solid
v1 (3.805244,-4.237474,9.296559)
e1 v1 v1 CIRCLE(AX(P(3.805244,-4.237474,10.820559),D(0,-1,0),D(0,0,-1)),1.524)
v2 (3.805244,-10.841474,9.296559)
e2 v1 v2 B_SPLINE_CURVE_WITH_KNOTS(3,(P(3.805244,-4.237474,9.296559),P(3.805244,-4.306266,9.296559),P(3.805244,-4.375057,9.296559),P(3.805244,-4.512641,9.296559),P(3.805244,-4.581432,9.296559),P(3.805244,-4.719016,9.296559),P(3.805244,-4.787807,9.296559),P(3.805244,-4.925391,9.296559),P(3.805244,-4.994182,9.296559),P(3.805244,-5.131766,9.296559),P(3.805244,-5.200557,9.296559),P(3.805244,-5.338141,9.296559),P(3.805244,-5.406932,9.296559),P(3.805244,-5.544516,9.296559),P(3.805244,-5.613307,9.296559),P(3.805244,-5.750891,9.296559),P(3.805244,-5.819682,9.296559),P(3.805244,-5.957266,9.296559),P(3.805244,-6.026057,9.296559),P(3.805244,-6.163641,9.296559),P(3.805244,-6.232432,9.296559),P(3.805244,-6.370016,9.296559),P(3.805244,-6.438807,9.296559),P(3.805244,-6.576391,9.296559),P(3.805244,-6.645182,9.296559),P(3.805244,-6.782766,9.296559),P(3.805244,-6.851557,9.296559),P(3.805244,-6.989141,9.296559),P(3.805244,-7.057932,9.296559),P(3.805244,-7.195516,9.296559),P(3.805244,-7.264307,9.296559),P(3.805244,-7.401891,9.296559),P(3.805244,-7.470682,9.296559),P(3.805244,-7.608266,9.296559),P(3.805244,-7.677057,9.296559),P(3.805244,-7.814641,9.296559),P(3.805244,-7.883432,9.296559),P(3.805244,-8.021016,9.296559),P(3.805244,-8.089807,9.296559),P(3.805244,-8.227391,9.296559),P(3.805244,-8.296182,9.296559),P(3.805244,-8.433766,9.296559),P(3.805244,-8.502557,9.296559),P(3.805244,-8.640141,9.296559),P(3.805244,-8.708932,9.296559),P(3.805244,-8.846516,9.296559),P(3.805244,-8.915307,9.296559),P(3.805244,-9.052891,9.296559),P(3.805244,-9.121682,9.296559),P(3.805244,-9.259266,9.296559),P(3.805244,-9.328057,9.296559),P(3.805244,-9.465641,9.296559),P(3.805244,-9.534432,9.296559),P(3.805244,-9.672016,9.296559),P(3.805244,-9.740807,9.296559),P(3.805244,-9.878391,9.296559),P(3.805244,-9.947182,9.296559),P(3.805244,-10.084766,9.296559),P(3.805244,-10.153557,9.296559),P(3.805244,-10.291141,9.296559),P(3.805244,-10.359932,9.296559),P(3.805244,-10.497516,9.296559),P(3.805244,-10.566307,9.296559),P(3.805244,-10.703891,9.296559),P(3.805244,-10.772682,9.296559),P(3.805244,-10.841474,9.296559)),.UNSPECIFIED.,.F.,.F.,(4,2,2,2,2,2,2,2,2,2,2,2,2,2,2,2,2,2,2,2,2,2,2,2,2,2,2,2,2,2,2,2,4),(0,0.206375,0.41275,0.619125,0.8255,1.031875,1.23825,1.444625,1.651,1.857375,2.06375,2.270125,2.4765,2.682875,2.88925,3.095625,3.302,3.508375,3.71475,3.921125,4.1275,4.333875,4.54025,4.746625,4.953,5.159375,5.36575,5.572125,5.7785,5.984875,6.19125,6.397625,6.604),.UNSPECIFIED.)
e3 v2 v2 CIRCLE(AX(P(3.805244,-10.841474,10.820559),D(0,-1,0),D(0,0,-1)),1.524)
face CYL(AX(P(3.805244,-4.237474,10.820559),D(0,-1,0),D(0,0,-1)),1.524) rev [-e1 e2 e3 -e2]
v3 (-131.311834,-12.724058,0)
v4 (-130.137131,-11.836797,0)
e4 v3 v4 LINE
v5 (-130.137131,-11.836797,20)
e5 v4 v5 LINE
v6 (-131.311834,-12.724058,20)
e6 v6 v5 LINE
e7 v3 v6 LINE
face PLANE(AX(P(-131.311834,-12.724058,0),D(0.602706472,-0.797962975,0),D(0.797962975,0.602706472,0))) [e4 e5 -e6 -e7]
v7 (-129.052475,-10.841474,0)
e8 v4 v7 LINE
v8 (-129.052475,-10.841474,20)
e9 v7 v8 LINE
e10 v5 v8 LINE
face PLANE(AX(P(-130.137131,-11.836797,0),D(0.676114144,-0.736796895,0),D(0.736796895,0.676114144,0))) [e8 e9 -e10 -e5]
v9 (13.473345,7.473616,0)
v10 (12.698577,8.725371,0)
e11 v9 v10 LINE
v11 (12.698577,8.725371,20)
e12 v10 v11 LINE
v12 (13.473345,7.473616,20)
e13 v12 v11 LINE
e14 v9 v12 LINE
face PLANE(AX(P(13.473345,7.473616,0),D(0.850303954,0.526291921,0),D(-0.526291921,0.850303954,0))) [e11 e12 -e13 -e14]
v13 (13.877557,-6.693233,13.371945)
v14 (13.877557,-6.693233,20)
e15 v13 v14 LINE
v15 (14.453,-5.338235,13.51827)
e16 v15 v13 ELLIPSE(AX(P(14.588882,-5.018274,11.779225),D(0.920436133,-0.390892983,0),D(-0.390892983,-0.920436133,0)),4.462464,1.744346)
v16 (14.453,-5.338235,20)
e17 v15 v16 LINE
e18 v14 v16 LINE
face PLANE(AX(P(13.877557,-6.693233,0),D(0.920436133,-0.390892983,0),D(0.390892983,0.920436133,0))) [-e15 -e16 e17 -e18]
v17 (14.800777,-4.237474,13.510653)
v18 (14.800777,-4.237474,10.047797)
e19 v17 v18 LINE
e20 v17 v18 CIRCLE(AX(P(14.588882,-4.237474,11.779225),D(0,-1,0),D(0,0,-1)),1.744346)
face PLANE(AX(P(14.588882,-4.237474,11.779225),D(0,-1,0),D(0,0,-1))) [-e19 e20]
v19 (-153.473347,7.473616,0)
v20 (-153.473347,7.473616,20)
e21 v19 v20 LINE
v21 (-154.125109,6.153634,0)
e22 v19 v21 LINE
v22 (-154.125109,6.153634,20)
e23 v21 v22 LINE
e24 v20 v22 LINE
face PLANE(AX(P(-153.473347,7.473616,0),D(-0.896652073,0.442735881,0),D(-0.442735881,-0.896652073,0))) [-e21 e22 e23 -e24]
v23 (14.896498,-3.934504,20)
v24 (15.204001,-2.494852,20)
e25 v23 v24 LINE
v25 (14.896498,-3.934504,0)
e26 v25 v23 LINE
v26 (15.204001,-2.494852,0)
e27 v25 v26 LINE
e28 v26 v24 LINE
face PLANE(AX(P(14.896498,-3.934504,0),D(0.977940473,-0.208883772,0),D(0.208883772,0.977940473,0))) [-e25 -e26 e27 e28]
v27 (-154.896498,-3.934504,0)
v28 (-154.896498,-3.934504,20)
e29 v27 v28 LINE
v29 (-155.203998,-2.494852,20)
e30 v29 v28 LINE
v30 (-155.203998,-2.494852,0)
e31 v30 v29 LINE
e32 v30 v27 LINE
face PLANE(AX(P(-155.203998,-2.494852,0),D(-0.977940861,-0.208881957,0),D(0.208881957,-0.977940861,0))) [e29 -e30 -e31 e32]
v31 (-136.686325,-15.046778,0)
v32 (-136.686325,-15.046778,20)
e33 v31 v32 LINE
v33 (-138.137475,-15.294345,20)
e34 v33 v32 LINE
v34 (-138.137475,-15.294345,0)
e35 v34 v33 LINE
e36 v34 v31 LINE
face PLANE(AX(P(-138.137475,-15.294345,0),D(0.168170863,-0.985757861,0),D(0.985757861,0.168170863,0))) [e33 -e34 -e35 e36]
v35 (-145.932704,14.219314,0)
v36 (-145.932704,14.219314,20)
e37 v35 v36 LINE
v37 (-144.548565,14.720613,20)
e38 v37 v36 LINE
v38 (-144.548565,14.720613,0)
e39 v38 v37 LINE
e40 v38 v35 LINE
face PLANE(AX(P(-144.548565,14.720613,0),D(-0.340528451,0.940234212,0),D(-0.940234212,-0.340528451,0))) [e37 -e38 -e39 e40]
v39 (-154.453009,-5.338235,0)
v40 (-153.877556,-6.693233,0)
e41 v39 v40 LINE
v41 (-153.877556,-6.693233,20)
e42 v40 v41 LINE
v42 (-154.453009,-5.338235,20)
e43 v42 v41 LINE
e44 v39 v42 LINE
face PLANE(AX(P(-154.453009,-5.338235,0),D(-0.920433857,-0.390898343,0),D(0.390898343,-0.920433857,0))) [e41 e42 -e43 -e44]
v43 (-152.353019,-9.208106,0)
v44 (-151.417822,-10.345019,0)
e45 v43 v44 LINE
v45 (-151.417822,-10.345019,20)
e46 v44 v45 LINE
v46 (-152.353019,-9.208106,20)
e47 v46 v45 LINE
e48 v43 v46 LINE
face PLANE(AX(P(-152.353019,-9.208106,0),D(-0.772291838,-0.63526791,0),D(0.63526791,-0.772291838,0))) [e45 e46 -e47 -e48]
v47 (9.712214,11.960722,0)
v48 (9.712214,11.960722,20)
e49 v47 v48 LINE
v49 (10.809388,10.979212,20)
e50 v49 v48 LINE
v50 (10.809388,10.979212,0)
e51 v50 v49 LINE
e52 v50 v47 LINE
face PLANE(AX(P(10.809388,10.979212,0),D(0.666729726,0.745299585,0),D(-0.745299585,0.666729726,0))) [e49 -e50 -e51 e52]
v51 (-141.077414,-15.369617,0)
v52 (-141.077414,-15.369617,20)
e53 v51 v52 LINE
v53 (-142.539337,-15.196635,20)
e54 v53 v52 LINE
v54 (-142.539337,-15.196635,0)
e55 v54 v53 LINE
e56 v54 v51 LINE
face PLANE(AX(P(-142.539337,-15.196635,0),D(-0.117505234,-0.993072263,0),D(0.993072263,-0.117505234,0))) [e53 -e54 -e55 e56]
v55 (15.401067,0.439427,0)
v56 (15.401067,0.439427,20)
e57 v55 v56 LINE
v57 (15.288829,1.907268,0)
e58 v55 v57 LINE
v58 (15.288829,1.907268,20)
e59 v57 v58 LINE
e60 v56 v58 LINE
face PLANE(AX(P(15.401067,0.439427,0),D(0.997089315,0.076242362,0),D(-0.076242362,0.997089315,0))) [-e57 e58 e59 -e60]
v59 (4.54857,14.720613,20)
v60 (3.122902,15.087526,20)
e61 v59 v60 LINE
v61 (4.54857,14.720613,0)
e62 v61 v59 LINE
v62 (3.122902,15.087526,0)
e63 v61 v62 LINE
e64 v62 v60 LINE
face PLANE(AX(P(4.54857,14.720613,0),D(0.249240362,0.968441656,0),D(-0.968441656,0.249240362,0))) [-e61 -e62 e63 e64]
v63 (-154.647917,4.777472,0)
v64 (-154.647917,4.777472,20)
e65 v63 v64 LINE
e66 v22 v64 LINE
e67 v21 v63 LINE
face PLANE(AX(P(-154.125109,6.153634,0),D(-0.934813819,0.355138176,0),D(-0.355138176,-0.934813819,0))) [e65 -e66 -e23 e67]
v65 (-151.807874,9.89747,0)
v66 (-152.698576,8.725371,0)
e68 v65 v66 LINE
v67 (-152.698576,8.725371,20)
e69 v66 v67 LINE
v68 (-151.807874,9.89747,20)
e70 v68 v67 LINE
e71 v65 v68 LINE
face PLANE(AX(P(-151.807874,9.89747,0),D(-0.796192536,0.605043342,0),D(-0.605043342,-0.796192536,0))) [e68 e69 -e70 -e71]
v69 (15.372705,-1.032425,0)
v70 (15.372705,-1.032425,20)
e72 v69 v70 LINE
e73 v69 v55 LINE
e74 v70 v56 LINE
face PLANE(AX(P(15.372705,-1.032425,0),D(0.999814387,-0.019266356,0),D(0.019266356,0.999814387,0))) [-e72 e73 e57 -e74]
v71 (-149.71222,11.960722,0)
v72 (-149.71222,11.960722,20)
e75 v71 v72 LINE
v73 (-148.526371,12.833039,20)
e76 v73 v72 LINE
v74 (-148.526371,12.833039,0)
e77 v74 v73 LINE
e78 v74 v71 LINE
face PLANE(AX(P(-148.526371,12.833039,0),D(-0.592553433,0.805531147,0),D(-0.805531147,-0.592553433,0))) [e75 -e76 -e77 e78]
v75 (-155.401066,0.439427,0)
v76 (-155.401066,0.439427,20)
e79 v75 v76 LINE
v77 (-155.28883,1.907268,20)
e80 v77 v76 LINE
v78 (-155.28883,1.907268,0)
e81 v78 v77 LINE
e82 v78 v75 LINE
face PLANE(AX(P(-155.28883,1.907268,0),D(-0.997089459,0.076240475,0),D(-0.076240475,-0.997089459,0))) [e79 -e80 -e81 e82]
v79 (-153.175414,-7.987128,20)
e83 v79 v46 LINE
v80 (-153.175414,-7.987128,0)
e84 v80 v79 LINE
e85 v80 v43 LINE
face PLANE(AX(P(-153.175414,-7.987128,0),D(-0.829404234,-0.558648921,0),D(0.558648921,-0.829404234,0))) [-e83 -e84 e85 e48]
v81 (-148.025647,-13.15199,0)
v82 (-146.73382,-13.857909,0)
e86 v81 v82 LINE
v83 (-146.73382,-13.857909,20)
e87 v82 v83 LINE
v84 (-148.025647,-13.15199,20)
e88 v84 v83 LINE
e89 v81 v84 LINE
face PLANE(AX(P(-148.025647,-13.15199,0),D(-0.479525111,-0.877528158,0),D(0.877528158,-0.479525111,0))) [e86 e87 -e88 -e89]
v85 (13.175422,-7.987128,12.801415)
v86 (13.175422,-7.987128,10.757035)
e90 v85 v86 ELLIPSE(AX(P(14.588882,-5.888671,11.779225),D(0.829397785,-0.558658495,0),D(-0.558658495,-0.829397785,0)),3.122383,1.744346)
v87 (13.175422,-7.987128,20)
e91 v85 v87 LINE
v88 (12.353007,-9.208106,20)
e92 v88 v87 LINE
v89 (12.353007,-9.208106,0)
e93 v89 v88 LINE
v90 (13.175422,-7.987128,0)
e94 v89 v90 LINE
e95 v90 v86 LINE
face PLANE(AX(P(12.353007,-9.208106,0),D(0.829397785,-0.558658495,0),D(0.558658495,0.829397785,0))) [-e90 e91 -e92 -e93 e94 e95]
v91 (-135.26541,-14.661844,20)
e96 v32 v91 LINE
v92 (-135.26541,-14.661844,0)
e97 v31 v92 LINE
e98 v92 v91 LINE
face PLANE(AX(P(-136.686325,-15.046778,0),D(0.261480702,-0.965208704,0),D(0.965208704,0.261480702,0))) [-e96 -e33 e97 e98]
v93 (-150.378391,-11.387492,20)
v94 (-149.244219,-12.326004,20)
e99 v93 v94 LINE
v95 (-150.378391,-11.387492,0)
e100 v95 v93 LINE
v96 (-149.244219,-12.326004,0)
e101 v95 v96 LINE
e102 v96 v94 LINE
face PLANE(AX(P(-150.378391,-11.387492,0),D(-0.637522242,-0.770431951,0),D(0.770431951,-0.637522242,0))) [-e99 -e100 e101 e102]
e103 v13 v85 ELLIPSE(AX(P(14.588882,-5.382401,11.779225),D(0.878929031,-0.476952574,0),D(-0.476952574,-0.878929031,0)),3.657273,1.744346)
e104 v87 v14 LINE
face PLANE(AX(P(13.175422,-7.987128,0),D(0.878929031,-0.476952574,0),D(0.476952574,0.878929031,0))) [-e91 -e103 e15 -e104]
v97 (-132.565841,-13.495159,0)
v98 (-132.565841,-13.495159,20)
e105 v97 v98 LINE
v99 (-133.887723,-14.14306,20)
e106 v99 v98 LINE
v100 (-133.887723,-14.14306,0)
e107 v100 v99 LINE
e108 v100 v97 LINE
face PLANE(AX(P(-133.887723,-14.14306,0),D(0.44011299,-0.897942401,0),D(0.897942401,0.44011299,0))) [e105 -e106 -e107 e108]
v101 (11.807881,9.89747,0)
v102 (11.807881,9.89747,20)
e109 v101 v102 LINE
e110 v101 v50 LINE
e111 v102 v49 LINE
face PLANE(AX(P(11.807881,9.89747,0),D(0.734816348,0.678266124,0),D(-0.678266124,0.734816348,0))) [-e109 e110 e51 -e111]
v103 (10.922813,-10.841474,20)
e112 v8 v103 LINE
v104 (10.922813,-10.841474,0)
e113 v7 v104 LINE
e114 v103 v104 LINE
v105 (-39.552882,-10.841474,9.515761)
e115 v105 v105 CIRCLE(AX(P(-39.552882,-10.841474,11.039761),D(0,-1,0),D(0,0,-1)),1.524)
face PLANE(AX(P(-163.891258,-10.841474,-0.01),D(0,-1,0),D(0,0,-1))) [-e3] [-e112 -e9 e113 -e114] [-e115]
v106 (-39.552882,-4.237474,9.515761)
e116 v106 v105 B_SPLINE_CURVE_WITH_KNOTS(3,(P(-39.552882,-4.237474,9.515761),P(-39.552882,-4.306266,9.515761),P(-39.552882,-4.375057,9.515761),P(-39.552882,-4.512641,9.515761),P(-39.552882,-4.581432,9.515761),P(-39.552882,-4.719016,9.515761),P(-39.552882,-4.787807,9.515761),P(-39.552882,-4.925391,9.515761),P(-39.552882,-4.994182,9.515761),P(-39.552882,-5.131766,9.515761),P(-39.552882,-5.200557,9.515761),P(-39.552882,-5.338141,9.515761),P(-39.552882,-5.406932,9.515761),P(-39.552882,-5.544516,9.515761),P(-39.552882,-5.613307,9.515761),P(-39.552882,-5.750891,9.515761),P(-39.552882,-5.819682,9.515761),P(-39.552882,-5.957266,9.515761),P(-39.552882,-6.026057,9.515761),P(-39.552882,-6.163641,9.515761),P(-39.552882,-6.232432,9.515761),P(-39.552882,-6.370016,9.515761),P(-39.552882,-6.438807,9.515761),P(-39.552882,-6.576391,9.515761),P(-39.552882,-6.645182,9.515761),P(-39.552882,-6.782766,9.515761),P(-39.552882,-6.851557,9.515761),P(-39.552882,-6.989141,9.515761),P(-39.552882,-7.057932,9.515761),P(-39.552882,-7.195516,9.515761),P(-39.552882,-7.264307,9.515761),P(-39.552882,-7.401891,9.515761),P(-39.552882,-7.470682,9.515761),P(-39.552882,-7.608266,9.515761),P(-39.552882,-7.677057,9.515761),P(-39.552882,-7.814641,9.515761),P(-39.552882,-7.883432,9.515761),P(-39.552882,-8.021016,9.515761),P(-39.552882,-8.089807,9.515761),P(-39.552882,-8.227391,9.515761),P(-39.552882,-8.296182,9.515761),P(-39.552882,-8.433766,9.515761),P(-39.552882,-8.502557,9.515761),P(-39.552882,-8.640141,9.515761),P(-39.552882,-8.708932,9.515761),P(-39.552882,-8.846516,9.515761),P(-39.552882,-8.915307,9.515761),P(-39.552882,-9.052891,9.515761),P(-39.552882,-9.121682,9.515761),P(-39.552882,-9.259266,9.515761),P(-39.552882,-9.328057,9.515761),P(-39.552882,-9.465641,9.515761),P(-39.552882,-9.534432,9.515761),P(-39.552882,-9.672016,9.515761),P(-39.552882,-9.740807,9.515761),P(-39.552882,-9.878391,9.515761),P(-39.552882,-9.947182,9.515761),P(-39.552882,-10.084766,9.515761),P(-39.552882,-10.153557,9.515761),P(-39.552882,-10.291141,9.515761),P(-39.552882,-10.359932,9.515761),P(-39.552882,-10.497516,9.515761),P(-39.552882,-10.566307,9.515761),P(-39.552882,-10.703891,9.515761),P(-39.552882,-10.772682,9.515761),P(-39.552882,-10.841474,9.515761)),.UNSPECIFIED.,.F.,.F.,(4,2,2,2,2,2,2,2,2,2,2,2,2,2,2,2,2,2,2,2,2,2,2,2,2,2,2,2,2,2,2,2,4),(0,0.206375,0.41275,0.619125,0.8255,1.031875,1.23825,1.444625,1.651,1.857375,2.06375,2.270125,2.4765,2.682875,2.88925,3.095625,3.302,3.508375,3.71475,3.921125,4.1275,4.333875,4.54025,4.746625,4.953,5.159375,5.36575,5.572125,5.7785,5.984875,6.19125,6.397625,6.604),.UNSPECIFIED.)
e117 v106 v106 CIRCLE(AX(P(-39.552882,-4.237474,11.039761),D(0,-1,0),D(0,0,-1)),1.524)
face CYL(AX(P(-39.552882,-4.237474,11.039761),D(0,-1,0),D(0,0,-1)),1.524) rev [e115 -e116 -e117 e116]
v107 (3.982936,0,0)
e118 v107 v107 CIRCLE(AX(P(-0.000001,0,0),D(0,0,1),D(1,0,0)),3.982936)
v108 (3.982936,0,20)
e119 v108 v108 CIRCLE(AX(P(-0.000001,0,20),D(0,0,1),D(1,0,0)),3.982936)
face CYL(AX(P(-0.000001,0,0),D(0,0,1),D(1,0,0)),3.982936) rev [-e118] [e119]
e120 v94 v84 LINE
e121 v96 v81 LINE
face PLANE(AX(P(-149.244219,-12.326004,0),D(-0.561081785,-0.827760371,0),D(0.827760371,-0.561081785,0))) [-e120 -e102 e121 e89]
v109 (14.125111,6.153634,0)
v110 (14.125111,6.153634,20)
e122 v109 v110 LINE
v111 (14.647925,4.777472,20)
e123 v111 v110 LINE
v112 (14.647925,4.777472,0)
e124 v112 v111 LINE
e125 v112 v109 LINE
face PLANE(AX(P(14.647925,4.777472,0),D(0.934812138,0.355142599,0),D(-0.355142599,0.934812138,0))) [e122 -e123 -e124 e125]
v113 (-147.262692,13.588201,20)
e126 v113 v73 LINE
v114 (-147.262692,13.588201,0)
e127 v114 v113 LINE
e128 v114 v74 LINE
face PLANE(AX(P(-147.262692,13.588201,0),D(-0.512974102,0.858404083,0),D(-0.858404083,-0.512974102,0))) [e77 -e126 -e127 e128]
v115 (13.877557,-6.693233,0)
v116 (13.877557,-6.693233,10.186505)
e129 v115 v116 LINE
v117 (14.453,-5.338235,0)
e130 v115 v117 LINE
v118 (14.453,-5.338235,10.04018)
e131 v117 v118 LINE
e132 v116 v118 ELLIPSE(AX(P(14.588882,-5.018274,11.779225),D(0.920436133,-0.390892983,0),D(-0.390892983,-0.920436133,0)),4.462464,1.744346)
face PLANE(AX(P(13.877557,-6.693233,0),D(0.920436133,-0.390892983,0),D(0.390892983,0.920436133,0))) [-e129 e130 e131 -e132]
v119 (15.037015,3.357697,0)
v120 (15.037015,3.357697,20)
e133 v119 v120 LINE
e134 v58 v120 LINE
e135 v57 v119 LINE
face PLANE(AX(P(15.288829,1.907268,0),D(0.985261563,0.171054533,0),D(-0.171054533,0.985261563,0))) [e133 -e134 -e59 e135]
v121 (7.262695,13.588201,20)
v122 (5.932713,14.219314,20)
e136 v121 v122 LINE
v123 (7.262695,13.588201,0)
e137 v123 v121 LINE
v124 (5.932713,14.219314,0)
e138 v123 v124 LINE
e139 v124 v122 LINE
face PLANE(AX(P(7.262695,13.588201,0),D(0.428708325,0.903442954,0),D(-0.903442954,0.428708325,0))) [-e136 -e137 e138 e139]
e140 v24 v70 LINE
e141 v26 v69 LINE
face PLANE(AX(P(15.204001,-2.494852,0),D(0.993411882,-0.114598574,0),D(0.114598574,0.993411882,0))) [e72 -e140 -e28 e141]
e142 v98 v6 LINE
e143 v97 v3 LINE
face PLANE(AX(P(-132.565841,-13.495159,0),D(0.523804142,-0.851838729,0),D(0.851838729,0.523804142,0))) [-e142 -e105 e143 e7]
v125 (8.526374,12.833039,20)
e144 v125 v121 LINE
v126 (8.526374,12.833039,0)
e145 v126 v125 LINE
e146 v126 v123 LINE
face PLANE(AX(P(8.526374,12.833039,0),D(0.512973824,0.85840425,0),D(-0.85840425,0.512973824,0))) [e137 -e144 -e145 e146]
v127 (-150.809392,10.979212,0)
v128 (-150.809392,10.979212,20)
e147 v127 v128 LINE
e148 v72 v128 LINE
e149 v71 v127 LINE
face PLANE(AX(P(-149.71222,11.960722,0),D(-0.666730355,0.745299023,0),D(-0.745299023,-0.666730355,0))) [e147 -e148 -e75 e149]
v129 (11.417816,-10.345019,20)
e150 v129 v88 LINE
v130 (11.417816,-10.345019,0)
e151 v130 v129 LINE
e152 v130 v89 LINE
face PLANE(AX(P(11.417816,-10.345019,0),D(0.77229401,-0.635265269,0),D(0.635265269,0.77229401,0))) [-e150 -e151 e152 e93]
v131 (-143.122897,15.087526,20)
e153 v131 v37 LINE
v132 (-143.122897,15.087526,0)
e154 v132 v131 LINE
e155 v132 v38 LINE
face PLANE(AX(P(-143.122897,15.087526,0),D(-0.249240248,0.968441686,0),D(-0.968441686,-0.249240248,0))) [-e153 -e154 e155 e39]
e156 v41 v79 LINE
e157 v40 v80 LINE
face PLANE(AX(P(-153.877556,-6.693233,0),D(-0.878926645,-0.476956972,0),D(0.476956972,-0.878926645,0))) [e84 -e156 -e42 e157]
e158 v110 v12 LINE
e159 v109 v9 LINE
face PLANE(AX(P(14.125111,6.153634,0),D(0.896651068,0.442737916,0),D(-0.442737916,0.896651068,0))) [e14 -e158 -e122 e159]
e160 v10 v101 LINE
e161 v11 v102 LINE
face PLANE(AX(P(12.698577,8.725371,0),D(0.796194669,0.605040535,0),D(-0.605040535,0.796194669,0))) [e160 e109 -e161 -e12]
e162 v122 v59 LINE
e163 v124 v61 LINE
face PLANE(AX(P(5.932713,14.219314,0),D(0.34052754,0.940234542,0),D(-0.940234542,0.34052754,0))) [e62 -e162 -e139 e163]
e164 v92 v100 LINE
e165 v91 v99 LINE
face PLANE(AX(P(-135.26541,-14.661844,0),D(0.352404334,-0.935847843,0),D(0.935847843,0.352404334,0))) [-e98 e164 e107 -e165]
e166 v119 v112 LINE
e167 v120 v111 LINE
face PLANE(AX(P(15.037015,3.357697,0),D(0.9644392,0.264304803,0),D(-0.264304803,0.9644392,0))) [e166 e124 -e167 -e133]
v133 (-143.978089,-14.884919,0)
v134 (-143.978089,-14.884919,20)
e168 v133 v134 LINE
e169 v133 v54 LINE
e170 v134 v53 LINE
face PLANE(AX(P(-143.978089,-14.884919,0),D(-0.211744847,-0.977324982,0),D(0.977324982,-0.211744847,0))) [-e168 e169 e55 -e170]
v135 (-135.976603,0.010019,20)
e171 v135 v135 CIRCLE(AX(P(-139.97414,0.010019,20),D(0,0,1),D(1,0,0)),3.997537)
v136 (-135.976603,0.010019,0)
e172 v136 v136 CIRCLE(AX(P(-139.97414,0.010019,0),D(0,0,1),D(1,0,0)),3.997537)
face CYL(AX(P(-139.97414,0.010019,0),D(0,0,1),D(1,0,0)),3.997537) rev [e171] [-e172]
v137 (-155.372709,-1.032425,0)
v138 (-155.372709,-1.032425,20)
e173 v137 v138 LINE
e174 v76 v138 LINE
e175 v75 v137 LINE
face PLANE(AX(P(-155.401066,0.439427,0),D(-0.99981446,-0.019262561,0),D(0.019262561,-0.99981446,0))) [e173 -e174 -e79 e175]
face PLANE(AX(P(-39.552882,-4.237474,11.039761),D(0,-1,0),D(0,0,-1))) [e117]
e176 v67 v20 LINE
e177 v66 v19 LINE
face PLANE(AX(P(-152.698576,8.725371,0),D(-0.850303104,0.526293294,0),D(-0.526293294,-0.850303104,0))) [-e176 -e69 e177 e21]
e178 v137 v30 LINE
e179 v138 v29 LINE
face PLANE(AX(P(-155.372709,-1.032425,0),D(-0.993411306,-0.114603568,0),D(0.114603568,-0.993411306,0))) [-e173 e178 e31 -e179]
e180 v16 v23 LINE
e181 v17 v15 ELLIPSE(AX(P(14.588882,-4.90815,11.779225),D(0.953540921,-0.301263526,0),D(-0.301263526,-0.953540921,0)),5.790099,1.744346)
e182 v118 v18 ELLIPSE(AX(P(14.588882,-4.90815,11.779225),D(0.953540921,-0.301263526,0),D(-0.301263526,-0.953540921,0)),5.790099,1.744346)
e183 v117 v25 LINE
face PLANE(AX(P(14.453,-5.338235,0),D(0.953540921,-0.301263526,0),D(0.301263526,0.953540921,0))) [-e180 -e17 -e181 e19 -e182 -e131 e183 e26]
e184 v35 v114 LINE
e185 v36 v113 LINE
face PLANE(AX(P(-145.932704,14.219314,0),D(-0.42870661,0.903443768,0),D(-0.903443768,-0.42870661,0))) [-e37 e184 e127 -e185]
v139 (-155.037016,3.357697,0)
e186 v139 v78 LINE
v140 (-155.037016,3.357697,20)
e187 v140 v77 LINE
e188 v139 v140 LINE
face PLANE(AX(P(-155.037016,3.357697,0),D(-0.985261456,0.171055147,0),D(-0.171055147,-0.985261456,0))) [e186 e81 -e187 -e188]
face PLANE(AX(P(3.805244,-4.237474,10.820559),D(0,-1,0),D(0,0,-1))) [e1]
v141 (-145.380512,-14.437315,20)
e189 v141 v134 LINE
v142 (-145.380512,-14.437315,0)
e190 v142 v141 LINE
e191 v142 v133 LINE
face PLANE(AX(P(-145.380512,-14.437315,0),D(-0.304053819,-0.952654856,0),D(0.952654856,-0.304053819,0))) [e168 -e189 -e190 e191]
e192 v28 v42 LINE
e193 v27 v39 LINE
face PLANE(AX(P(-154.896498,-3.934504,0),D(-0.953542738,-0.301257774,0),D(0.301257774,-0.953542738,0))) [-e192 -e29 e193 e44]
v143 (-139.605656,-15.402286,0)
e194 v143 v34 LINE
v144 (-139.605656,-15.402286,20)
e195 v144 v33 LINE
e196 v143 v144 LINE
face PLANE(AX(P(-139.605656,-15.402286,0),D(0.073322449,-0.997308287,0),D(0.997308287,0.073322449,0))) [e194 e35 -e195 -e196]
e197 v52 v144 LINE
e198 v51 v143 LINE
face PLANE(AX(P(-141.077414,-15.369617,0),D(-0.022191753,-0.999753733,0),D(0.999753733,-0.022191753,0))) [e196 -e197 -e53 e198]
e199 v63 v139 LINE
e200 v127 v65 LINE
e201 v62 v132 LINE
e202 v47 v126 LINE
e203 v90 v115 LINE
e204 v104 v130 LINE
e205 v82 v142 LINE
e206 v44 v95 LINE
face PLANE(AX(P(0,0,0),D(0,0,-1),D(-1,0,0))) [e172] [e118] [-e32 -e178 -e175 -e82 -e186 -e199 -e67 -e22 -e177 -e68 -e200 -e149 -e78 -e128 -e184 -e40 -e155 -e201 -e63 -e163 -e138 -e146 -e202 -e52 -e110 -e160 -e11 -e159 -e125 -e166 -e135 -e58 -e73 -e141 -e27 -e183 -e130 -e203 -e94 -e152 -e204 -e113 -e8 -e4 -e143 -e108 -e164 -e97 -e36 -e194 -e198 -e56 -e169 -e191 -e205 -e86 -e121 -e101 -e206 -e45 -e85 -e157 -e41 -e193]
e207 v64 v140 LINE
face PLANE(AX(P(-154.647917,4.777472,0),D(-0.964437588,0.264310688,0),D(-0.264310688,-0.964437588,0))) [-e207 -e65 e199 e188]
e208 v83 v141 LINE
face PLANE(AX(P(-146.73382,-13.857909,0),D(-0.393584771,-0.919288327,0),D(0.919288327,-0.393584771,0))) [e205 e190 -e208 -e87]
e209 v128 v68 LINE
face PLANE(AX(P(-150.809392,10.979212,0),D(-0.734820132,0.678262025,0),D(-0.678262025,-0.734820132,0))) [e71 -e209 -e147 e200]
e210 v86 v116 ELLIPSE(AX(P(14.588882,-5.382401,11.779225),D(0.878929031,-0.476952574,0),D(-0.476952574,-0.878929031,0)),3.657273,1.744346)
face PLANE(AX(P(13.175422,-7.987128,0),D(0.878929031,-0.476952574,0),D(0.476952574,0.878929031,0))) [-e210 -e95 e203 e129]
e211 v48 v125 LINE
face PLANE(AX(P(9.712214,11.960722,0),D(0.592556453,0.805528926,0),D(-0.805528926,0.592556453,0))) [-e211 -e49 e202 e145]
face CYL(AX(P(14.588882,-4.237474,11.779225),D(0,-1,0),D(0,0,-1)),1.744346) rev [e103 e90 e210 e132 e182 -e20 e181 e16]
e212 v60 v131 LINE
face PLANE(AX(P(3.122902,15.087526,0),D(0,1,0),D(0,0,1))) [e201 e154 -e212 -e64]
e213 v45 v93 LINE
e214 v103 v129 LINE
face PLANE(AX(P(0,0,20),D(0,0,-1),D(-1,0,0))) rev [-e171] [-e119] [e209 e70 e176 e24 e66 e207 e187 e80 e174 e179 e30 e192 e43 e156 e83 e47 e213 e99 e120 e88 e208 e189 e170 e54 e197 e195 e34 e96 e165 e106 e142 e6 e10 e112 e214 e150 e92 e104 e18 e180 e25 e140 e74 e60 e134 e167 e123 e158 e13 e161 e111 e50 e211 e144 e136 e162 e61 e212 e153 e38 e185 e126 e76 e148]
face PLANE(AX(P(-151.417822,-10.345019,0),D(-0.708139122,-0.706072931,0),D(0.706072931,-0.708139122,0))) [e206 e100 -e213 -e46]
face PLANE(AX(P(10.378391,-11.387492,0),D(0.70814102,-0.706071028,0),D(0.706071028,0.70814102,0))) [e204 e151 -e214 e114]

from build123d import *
from OCP.BRepAlgoAPI import BRepAlgoAPI_Cut
from OCP.TopTools import TopTools_ListOfShape

# Parameters (mm, degrees)
BOSS_EXTRUDE1_DEPTH      = 19.999999553
CUT_EXTRUDE1_DEPTH       = 158.4379932
CUT_EXTRUDE2_DEPTH       = 158.4379932
SKETCH7_W                = 17.271465807
SKETCH7_H                = 13.849760317
SKETCH7_W_2              = 14.338575387
SKETCH7_H_2              = 12.546253463
BOSS_EXTRUDE4_DEPTH      = 20
SKETCH6_R                = 3.997536833
SKETCH6_R_2              = 3.982936498
CUT_EXTRUDE4_DEPTH       = 20
SPLIT1_SURFACE_1_BACK    = 175.651
SPLIT1_SURFACE_1_DEPTH   = 351.302
SPLIT1_SURFACE_2_BACK    = 175.651
SPLIT1_SURFACE_2_DEPTH   = 351.302
BODY_DELETE_KEEP_3_DEPTH = 19.999999553
SKETCH15_R               = 1.744345672
CUT_EXTRUDE8_DEPTH       = 6.604
SKETCH18_R               = 1.524
CUT_EXTRUDE10_DEPTH      = 6.604
SKETCH21_R               = 1.524
CUT_EXTRUDE12_DEPTH      = 6.604


with BuildPart() as part:
    # Sketch1 → Boss-Extrude1 (new body)
    with BuildSketch(Plane.XY.offset(19.999999553)):
        Polygon((-147.262692451, 13.588201255), (-148.526370525, 12.833039276), (-149.712219834, 11.960721575), (-150.809392333, 10.979211889), (-151.807874441, 9.897469543), (-152.69857645, 8.725371212), (-153.473347425, 7.473616395), (-154.125109315, 6.153633818), (-154.647916555, 4.777472466), (-155.037015676, 3.357697045), (-155.2888304, 1.907268073), (-155.401065946, 0.439427269), (-155.372709036, -1.032425207), (-155.203998089, -2.494852291), (-154.896497726, -3.934503533), (-154.453009367, -5.338235293), (-153.877556324, -6.69323327), (-153.175413609, -7.987127639), (-152.353018522, -9.208105505), (-151.417821646, -10.3450194), (-150.378391147, -11.387491599), (-149.244219065, -12.326003984), (-148.025646806, -13.15199025), (-146.733820438, -13.857908547), (-145.38051188, -14.437315054), (-143.978089094, -14.884918928), (-142.539337277, -15.196635388), (-141.077414155, -15.36961738), (-139.605656266, -15.402286313), (-138.137474656, -15.294345096), (-136.686325073, -15.046778135), (-135.265409946, -14.661843888), (-133.887723088, -14.143059961), (-132.565841079, -13.495159335), (-131.311833858, -12.724057771), (-130.137130618, -11.836796999), (-129.052475095, -10.841473937), (-10.947530158, -10.841473937), (-9.862869047, -11.836796999), (-8.688169532, -12.724057771), (-7.434152998, -13.495159335), (-6.112268195, -14.143059961), (-4.734582733, -14.661843888), (-3.313674591, -15.046778135), (-1.862514997, -15.294345096), (-0.394351926, -15.402286313), (1.077411231, -15.36961738), (2.539338311, -15.196635388), (3.978083376, -14.884918928), (5.380511284, -14.437315054), (6.733819377, -13.857908547), (8.025652729, -13.15199025), (9.244217537, -12.326003984), (10.378391482, -11.387491599), (11.417816393, -10.3450194), (12.35300675, -9.208105505), (13.175422326, -7.987127639), (13.877556659, -6.69323327), (14.453000389, -5.338235293), (14.896498062, -3.934503533), (15.204001218, -2.494852291), (15.372704715, -1.032425207), (15.401067212, 0.439427269), (15.288828872, 1.907268073), (15.03701508, 3.357697045), (14.647925273, 4.777472466), (14.125110582, 6.153633818), (13.473344967, 7.473616395), (12.698576786, 8.725371212), (11.807881296, 9.897469543), (10.809388012, 10.979211889), (9.71221365, 11.960721575), (8.526373655, 12.833039276), (7.262694649, 13.588201255), (5.932712927, 14.21931386), (4.548569676, 14.720613137), (3.122901777, 15.087526292), (-143.122896552, 15.087526292), (-144.548565149, 14.720613137), (-145.93270421, 14.21931386), align=None)
    extrude(amount=-BOSS_EXTRUDE1_DEPTH)

    # Sketch2 → Cut-Extrude1 (cut, through all)
    with BuildSketch(Plane(origin=(0, 0, 0), x_dir=(-1, 0, 0), z_dir=(0, 0, -1))):
        Polygon((138.905346394, 3.847302636), (138.217046857, 3.580653109), (137.589469552, 3.192068776), (137.043967843, 2.694782568), (136.599138379, 2.105728723), (136.270105839, 1.444966649), (136.068105698, 0.73499803), (136.000007391, 0), (136.068105698, -0.73499803), (136.270105839, -1.444966649), (136.599138379, -2.105728723), (137.043967843, -2.694782568), (137.589469552, -3.192068776), (138.217046857, -3.580653109), (138.905346394, -3.847302636), (139.630913734, -3.982936498), (140.369072556, -3.982936498), (141.094654799, -3.847302636), (141.782954335, -3.580653109), (142.41053164, -3.192068776), (142.956033349, -2.694782568), (143.400862813, -2.105728723), (143.729895353, -1.444966649), (143.931895494, -0.73499803), (143.999993801, 0), (143.931895494, 0.73499803), (143.729895353, 1.444966649), (143.400862813, 2.105728723), (142.956033349, 2.694782568), (142.41053164, 3.192068776), (141.782954335, 3.580653109), (141.094654799, 3.847302636), (140.369072556, 3.982936498), (139.630913734, 3.982936498), align=None)
    extrude(amount=-CUT_EXTRUDE1_DEPTH, mode=Mode.SUBTRACT)

    # Sketch3 → Cut-Extrude2 (cut, through all)
    with BuildSketch(Plane(origin=(0, 0, 0), x_dir=(-1, 0, 0), z_dir=(0, 0, -1))):
        Polygon((-2.956035547, 2.694782568), (-3.400868736, 2.105728723), (-3.729888937, 1.444966649), (-3.93189257, 0.73499803), (-4.00000019, 0), (-3.93189257, -0.73499803), (-3.729888937, -1.444966649), (-3.400868736, -2.105728723), (-2.956035547, -2.694782568), (-2.410538495, -3.192068776), (-1.78295339, -3.580653109), (-1.094651991, -3.847302636), (-0.369073445, -3.982936498), (0.369073445, -3.982936498), (1.094651991, -3.847302636), (1.78295339, -3.580653109), (2.410538495, -3.192068776), (2.956035547, -2.694782568), (3.400868736, -2.105728723), (3.729888937, -1.444966649), (3.93189257, -0.73499803), (4.00000019, 0), (3.93189257, 0.73499803), (3.729888937, 1.444966649), (3.400868736, 2.105728723), (2.956035547, 2.694782568), (2.410538495, 3.192068776), (1.78295339, 3.580653109), (1.094651991, 3.847302636), (0.369073445, 3.982936498), (-0.369073445, 3.982936498), (-1.094651991, 3.847302636), (-1.78295339, 3.580653109), (-2.410538495, 3.192068776), align=None)
    extrude(amount=-CUT_EXTRUDE2_DEPTH, mode=Mode.SUBTRACT)

    # Sketch7 → Boss-Extrude4 (add)
    with BuildSketch(Plane.XY):
        with Locations((-138.922924236, -1.542356043)):
            Rectangle(SKETCH7_W, SKETCH7_H)
        with Locations((0.715247426, -0.890602616)):
            Rectangle(SKETCH7_W_2, SKETCH7_H_2)
    extrude(amount=BOSS_EXTRUDE4_DEPTH)


with BuildPart() as cut_extrude4_tool:
    # Sketch6 → Cut-Extrude4 (new body)
    with BuildSketch(Plane.XY.offset(19.999999553)):
        with Locations((-139.974139817, 0.010018843)):
            Circle(SKETCH6_R)
        with Locations((-5.81e-07, 0)):
            Circle(SKETCH6_R_2)
    extrude(amount=-CUT_EXTRUDE4_DEPTH)


with BuildPart() as part_1:
    add(part.part)

    # Cut-Extrude4: cut by cut_extrude4_tool, with a tolerance
    cut_extrude4_stock = TopTools_ListOfShape()
    cut_extrude4_stock.Append(part_1.part.wrapped)
    cut_extrude4_tools = TopTools_ListOfShape()
    cut_extrude4_tools.Append(cut_extrude4_tool.part.wrapped)
    cut_extrude4_cut = BRepAlgoAPI_Cut()
    cut_extrude4_cut.SetArguments(cut_extrude4_stock)
    cut_extrude4_cut.SetTools(cut_extrude4_tools)
    cut_extrude4_cut.SetFuzzyValue(0.00001)
    cut_extrude4_cut.Build()
    add(Compound.cast(cut_extrude4_cut.Shape()).solids(), mode=Mode.REPLACE)


with BuildPart() as body_2:
    # Split1: the piece behind the surface
    add(part_1.part)
    # Split1 surface: a surface, the sketch's curves swept straight by 351.302 mm
    with BuildLine(Plane.XY.offset(-SPLIT1_SURFACE_1_BACK), mode=Mode.PRIVATE) as split1_surface_1_path:
        Line((-163.891257917, -10.841473937), (71.448565983, -10.841473937))
    split1_surface_1 = Shell.extrude(split1_surface_1_path.wire(), (0 * SPLIT1_SURFACE_1_DEPTH, 0 * SPLIT1_SURFACE_1_DEPTH, 1 * SPLIT1_SURFACE_1_DEPTH))
    split(bisect_by=split1_surface_1, keep=Keep.BOTTOM)

    # Body-Delete/Keep 3: read off the stored shape, not the designer's step
    # Body-Delete/Keep 3 outline → Body-Delete/Keep 3 (cut)
    with BuildSketch(Plane.XY):
        Polygon((10.92281306, -10.841473937), (-10.947530158, -10.841473937), (-9.862869047, -11.836796999), (-8.688169532, -12.724057771), (-7.434152998, -13.495159335), (-6.112268195, -14.143059961), (-4.734582733, -14.661843888), (-3.313674591, -15.046778135), (-1.862514997, -15.294345096), (-0.394351926, -15.402286313), (1.077411231, -15.36961738), (2.539338311, -15.196635388), (3.978083376, -14.884918928), (5.380511284, -14.437315054), (6.733819377, -13.857908547), (8.025652729, -13.15199025), (9.244217537, -12.326003984), (10.378391482, -11.387491599), align=None)
    extrude(amount=BODY_DELETE_KEEP_3_DEPTH, mode=Mode.SUBTRACT)


with BuildPart() as part_2:
    add(part_1.part)

    # Split1: split by a surface, the side it looks to stays
    # Split1 surface: a surface, the sketch's curves swept straight by 351.302 mm
    with BuildLine(Plane.XY.offset(-SPLIT1_SURFACE_2_BACK), mode=Mode.PRIVATE) as split1_surface_2_path:
        Line((-163.891257917, -10.841473937), (71.448565983, -10.841473937))
    split1_surface_2 = Shell.extrude(split1_surface_2_path.wire(), (0 * SPLIT1_SURFACE_2_DEPTH, 0 * SPLIT1_SURFACE_2_DEPTH, 1 * SPLIT1_SURFACE_2_DEPTH))
    split(bisect_by=split1_surface_2, keep=Keep.TOP)

    # Combine1: union body 2
    add(body_2.part)

    # Sketch15 → Cut-Extrude8 (cut)
    with BuildSketch(Plane(origin=(572.8274653, -10.841473937, -774.382334298), x_dir=(-1, 0, 0), z_dir=(0, -1, 0))):
        with Locations((558.238583002, -786.161559021)):
            Circle(SKETCH15_R)
    extrude(amount=-CUT_EXTRUDE8_DEPTH, mode=Mode.SUBTRACT)

    # Sketch18 → Cut-Extrude10 (cut)
    with BuildSketch(Plane(origin=(572.8274653, -10.841473937, -774.382334298), x_dir=(-1, 0, 0), z_dir=(0, -1, 0))):
        with Locations(Location((569.02222175, -785.202893663, 0), (0, 0, 90))):
            Circle(SKETCH18_R)
    extrude(amount=-CUT_EXTRUDE10_DEPTH, mode=Mode.SUBTRACT)

    # Sketch21 → Cut-Extrude12 (cut)
    with BuildSketch(Plane(origin=(572.8274653, -10.841473937, -774.382334298), x_dir=(-1, 0, 0), z_dir=(0, -1, 0))):
        with Locations(Location((612.380347085, -785.422094839, 0), (0, 0, 90))):
            Circle(SKETCH21_R)
    extrude(amount=-CUT_EXTRUDE12_DEPTH, mode=Mode.SUBTRACT)


solid = part_2.part
